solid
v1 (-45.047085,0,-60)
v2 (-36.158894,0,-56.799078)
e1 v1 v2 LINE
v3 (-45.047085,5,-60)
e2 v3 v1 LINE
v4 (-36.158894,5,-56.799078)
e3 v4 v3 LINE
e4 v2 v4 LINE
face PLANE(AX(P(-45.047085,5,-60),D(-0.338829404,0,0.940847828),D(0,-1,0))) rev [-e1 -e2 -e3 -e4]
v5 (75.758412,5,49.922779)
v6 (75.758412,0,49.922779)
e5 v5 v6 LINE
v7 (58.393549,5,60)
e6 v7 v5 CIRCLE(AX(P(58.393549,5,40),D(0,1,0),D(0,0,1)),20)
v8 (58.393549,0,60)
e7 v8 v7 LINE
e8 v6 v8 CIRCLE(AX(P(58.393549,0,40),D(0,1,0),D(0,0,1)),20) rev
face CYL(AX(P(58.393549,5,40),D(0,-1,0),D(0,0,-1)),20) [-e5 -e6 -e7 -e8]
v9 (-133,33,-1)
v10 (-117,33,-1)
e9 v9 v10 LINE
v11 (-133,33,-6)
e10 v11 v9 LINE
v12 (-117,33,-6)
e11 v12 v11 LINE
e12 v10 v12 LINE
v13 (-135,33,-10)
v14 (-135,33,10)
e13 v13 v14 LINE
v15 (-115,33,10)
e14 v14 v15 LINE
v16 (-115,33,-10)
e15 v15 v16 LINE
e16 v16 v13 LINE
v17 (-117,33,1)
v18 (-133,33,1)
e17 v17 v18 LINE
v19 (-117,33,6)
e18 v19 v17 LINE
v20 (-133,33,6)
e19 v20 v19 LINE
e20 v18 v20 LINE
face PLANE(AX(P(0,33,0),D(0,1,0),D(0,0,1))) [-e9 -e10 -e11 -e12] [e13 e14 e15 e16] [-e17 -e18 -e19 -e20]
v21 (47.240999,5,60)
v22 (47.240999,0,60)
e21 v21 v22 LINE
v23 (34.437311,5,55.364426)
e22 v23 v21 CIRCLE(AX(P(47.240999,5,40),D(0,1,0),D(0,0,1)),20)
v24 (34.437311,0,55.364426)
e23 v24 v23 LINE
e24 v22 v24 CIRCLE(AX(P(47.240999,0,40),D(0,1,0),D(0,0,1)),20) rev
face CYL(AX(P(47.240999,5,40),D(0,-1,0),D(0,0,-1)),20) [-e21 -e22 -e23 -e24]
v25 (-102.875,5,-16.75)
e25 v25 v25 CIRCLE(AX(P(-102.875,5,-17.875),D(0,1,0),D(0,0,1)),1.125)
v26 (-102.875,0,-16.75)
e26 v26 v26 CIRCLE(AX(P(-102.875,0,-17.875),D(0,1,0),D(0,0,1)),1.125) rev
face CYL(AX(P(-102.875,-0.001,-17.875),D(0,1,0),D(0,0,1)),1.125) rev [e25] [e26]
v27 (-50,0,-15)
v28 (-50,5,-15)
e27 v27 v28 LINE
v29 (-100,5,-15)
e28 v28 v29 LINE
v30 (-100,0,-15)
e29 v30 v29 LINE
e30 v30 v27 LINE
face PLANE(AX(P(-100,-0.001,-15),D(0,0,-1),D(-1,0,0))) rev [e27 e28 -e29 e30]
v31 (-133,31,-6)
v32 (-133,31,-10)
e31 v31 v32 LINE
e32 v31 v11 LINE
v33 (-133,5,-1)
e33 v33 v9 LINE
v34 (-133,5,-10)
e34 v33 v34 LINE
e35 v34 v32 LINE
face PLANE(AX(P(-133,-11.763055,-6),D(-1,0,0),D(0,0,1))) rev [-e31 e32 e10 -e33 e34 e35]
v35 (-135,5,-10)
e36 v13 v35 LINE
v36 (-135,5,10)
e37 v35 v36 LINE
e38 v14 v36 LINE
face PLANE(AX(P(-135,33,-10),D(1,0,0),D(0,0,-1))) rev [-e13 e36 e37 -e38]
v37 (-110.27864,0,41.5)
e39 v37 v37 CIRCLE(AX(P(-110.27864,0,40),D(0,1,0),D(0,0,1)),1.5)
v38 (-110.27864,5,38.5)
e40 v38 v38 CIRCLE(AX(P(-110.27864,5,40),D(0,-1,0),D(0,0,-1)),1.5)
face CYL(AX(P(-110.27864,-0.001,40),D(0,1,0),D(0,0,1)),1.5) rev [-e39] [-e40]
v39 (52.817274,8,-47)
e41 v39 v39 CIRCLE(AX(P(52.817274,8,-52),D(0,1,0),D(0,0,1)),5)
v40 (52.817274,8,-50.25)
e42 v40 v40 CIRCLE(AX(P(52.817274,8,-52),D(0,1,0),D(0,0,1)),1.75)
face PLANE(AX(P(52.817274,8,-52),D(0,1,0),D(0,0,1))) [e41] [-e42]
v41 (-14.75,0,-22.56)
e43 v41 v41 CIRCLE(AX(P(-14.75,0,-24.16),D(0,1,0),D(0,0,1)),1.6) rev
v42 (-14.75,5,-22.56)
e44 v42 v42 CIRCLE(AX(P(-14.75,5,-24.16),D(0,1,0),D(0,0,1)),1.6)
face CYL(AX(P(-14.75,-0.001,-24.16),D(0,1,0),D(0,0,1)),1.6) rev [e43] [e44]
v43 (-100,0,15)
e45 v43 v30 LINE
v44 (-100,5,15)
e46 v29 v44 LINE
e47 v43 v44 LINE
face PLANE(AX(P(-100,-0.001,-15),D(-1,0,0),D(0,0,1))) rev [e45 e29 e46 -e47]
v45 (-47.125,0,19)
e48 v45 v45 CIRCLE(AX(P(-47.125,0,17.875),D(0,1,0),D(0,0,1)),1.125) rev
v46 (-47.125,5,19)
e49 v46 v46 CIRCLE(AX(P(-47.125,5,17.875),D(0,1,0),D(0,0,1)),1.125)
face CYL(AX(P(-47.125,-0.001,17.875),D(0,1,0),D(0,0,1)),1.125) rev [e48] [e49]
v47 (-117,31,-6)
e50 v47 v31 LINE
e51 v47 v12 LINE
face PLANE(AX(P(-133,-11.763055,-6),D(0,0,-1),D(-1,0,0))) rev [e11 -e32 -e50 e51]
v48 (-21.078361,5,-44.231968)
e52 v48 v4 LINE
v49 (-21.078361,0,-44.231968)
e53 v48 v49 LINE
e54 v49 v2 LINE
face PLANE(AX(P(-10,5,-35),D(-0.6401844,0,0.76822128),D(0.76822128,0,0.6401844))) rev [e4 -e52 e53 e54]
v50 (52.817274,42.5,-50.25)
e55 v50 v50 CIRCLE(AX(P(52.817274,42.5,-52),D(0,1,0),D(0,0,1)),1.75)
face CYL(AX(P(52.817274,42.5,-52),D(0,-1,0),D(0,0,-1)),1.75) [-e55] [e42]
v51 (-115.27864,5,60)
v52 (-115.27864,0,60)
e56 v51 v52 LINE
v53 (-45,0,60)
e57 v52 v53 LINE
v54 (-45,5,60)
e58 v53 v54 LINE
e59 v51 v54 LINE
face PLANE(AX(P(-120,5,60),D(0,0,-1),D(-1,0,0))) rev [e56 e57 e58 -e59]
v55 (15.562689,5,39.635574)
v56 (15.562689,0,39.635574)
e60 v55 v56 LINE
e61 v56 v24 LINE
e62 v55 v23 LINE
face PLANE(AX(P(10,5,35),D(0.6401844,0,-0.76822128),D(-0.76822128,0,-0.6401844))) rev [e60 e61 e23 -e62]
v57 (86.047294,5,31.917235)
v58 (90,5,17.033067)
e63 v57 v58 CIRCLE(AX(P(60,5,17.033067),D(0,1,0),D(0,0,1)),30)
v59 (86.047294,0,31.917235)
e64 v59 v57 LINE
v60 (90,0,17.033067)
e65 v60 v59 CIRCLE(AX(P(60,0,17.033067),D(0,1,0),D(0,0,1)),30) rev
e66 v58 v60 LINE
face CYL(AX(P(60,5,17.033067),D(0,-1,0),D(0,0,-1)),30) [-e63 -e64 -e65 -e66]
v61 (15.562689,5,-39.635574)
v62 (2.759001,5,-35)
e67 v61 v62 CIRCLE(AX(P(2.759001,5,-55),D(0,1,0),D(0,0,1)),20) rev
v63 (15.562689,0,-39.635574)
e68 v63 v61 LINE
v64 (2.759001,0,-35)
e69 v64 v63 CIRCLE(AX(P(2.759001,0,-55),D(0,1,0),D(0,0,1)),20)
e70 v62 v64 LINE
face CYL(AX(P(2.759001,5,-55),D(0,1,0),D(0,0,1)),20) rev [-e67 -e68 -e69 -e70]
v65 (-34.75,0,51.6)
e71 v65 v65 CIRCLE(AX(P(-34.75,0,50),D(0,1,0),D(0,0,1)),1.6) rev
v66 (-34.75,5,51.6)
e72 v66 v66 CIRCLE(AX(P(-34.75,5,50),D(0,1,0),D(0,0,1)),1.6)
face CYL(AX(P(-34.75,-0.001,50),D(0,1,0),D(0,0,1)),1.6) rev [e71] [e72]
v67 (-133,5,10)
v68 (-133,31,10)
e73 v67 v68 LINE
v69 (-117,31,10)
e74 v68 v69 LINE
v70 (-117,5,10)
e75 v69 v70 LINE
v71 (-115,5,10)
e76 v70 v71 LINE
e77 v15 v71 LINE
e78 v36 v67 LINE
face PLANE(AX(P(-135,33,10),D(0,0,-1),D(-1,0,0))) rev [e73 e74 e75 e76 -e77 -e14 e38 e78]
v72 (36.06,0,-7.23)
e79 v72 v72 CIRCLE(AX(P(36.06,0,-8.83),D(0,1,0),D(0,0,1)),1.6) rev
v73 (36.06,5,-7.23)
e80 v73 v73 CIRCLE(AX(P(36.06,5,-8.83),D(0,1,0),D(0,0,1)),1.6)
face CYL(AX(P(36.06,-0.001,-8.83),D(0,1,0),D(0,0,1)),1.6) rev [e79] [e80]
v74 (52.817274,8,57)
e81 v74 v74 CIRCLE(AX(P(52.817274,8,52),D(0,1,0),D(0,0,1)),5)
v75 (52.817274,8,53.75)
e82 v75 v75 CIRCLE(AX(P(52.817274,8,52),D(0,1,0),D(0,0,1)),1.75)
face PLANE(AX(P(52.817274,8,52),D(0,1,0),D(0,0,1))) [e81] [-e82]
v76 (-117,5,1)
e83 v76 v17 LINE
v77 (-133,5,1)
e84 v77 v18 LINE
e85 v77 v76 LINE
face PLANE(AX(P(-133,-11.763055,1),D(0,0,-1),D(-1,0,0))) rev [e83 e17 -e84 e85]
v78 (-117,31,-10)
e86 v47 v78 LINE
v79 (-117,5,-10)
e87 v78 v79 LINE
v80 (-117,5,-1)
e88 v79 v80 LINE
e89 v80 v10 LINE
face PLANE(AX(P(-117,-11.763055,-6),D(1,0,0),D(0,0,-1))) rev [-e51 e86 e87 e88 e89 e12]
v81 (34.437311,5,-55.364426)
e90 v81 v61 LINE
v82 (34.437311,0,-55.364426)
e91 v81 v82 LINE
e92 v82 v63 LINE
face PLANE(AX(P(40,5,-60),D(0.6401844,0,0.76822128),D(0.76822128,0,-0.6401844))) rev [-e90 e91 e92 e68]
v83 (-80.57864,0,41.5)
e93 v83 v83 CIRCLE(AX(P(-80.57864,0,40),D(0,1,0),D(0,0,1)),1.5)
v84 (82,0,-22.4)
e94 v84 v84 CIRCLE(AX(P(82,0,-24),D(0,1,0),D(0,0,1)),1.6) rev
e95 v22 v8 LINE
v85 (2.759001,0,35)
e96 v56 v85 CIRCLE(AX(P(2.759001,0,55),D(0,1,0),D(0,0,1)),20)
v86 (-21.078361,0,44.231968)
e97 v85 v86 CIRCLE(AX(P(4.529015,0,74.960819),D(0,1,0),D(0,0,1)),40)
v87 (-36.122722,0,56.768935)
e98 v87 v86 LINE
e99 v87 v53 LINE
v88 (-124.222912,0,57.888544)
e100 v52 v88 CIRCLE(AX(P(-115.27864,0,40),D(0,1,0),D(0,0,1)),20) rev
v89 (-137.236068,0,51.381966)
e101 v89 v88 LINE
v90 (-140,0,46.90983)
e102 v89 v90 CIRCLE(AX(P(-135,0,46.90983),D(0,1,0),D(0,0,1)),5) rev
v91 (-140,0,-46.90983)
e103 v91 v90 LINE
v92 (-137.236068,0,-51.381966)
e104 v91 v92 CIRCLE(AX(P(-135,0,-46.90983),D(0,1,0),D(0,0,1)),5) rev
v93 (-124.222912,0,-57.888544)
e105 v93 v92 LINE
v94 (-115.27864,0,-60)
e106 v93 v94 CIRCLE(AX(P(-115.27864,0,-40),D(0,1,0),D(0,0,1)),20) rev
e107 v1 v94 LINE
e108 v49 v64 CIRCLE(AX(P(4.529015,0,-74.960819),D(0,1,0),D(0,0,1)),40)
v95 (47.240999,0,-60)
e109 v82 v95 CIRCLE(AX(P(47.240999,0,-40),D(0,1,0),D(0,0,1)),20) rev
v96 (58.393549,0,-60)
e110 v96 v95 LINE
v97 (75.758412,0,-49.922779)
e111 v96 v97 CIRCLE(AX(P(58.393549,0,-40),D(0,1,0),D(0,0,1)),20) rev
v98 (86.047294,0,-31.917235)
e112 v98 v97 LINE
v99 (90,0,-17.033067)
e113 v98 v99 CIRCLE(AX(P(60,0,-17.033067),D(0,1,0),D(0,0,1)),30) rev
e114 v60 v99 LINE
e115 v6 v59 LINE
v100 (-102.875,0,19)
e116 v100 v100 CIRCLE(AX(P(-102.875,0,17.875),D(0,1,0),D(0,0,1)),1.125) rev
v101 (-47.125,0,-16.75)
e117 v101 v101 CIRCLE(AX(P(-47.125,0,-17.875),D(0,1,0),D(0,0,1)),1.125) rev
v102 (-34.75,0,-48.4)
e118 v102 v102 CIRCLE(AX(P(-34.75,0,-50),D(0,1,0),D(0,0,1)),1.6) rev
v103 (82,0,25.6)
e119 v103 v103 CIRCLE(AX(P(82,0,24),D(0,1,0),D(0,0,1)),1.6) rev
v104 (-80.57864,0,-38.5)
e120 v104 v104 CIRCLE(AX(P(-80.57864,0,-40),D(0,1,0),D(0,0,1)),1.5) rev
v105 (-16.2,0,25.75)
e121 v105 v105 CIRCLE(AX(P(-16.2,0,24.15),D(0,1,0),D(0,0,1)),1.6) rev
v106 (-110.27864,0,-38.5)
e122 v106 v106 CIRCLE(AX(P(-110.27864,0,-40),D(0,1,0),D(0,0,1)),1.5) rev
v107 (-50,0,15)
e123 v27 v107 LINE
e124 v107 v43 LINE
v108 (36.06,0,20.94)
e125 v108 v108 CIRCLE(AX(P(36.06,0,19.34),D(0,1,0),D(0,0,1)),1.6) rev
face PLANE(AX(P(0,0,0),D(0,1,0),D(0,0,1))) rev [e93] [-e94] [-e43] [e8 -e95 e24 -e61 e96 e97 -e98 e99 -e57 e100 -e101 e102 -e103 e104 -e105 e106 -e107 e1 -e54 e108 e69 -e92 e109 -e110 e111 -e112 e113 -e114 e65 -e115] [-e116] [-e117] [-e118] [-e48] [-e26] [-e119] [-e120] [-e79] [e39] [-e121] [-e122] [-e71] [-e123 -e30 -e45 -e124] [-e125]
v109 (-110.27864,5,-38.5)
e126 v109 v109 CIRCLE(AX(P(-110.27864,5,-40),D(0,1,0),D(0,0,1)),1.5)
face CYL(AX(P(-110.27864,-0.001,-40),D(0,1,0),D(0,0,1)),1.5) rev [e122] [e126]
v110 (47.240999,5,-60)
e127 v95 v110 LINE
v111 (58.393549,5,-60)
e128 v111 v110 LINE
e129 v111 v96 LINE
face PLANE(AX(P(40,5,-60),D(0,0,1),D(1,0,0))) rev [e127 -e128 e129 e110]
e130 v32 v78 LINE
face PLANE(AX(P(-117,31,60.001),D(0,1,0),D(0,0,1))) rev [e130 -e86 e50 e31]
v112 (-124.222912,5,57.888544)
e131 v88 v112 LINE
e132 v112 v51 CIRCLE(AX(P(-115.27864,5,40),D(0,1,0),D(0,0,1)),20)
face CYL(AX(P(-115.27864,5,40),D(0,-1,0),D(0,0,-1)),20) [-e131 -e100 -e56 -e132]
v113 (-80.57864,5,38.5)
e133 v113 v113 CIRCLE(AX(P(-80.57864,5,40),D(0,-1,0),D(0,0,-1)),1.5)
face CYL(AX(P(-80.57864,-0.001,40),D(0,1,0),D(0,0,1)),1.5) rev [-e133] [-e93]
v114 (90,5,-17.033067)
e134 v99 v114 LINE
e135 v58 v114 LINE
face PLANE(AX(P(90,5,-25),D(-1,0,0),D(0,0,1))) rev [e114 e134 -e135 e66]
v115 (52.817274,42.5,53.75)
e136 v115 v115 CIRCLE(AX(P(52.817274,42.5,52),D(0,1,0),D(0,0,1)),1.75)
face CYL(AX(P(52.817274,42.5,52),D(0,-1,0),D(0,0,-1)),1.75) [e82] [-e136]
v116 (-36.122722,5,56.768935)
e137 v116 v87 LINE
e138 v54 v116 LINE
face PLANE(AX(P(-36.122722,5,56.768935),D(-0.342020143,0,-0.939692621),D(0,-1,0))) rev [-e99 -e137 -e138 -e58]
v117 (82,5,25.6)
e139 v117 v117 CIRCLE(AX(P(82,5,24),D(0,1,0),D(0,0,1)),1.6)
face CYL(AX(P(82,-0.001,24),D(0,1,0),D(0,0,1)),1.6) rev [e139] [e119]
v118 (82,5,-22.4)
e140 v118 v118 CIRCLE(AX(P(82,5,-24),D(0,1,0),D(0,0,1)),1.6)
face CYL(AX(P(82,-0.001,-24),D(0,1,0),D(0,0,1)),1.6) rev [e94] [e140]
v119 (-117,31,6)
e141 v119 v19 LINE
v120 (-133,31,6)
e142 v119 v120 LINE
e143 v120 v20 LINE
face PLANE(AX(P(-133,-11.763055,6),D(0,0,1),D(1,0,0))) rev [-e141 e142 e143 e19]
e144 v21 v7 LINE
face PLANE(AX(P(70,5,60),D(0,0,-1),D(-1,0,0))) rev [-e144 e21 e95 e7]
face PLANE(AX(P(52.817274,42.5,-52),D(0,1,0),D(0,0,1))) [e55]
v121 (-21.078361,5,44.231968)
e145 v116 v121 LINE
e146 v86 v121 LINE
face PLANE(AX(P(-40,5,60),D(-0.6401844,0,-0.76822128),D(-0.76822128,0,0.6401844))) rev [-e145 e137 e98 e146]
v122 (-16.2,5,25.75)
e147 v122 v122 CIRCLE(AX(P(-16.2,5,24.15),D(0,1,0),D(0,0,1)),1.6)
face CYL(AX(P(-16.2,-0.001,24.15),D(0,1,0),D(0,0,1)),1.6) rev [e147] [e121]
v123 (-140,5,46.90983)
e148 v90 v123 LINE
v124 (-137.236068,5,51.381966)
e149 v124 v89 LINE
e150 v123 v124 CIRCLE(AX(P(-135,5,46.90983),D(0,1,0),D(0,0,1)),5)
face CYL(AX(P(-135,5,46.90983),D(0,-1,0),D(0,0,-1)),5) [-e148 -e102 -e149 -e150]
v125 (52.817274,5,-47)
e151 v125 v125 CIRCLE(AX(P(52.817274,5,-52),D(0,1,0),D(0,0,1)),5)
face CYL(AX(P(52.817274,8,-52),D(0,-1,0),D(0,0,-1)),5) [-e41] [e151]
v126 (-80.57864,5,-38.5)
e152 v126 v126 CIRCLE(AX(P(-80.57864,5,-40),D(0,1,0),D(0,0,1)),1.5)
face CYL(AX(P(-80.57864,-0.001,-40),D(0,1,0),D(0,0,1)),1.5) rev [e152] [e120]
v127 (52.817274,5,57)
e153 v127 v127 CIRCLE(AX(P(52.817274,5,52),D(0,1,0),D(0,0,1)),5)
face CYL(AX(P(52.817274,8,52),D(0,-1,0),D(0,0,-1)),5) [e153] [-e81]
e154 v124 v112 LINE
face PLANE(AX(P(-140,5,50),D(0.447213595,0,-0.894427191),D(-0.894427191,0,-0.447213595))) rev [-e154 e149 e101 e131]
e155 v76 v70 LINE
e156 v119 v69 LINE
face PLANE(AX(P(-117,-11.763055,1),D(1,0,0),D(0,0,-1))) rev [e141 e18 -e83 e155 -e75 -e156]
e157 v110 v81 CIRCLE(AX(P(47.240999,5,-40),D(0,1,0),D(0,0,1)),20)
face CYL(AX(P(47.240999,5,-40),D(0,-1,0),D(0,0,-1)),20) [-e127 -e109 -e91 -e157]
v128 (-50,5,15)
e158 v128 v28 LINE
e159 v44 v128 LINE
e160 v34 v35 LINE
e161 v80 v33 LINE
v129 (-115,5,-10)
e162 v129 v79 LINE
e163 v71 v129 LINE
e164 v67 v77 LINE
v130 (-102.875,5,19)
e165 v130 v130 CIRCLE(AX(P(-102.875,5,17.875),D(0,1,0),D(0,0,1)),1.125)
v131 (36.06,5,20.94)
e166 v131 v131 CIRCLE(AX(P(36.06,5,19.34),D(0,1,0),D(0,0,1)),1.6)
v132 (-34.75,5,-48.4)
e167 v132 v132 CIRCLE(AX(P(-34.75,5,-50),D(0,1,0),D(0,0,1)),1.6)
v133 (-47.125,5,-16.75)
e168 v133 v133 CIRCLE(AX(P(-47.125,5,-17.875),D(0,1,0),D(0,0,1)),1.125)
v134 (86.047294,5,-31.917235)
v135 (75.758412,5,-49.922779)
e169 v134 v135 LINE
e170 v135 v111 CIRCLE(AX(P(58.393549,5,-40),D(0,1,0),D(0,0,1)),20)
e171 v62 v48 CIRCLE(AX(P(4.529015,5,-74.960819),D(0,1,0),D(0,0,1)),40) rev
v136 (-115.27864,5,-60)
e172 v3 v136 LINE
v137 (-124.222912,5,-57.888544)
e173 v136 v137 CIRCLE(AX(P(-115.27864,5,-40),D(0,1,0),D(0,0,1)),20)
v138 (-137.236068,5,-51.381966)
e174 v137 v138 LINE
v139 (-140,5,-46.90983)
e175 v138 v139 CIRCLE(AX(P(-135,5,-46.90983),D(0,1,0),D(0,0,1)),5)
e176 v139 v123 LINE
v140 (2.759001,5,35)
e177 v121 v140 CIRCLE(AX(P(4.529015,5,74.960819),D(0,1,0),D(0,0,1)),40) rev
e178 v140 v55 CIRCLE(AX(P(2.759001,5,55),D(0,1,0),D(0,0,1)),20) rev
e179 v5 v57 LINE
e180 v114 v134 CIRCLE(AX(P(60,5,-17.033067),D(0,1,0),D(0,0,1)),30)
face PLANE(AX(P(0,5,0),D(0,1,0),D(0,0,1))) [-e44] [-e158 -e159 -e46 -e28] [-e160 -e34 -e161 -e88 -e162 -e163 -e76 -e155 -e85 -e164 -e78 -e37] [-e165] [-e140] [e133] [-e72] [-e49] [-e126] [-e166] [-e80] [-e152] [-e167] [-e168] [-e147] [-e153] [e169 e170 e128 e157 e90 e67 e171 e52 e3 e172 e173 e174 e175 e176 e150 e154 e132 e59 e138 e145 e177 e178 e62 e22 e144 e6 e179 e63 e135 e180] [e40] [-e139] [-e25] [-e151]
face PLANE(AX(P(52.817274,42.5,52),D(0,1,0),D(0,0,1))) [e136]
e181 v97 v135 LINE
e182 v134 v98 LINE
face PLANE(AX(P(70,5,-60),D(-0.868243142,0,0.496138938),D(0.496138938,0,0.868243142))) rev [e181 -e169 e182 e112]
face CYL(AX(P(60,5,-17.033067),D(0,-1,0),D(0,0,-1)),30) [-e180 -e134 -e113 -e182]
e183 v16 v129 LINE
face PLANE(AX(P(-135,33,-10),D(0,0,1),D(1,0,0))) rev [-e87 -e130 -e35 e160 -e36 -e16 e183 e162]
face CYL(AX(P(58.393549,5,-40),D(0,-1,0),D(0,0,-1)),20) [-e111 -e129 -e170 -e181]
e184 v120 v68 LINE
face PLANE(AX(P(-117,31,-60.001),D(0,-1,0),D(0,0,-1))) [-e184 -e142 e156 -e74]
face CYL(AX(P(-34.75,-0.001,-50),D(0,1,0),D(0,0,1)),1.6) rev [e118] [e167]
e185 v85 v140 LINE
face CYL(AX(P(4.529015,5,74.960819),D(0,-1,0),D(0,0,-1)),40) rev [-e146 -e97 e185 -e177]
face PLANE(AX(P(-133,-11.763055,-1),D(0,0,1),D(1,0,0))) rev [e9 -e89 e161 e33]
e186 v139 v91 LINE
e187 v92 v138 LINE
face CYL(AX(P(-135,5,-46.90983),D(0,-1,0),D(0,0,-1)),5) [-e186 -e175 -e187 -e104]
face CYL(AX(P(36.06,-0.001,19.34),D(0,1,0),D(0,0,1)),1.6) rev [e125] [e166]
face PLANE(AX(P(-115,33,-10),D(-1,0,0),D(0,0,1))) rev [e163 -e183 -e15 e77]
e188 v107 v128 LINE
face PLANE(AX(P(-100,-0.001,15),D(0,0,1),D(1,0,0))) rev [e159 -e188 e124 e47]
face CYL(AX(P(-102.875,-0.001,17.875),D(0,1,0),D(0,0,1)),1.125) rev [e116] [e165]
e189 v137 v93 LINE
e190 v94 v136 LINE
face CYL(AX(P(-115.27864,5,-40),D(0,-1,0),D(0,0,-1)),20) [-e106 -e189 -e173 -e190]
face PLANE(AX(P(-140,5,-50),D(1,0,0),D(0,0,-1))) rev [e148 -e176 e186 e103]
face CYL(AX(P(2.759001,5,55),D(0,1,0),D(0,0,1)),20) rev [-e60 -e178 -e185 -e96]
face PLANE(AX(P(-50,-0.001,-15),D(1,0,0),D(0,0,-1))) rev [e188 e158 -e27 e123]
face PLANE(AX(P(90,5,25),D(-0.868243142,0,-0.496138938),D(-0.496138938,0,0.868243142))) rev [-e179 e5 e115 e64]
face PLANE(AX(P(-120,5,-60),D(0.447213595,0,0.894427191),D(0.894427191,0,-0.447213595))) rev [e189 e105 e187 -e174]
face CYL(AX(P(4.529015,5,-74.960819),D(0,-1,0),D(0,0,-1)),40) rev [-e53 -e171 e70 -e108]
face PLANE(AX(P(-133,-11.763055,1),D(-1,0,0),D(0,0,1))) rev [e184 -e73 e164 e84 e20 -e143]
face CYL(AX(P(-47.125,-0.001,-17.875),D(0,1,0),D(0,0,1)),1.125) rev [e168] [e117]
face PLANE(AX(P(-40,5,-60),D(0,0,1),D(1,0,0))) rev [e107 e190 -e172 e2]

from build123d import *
from OCP.BRepFilletAPI import BRepFilletAPI_MakeChamfer

# Parameters (mm, degrees)
BOSS_EXTRUDE1_DEPTH = 5
CHAMFER1_SIZE       = 5
CHAMFER1_SIZE2      = 5.047084744
FILLET4_R           = 20
FILLET5_R           = 30
FILLET6_R           = 20
FILLET7_R           = 40
FILLET8_R           = 20
FILLET9_R           = 5
CUT_EXTRUDE3_REACH  = 154.398
SKETCH7_R           = 1.5
SKETCH3_R           = 1.75
BOSS_EXTRUDE2_DEPTH = 37.5
SKETCH8_R           = 5
BOSS_EXTRUDE3_DEPTH = 3
SKETCH9_W           = 20
SKETCH9_H           = 20
BOSS_EXTRUDE4_DEPTH = 28
SKETCH12_W          = 16
SKETCH12_H          = 5
CUT_EXTRUDE5_DEPTH  = 28
CUT_EXTRUDE7_REACH  = 164.192
SKETCH13_W          = 16
SKETCH13_H          = 26
CUT_EXTRUDE8_REACH  = 158.864
SKETCH15_R          = 1.125
CUT_EXTRUDE10_REACH = 158.864
SKETCH16_W          = 50
SKETCH16_H          = 30
CUT_EXTRUDE11_REACH = 158.864
SKETCH17_R          = 1.6
CUT_EXTRUDE12_REACH = 158.864
SKETCH18_R          = 1.6
CUT_EXTRUDE13_REACH = 158.864
SKETCH19_R          = 1.6


with BuildPart() as part:
    # Sketch1 → Boss-Extrude1 (new body)
    with BuildSketch(Plane(origin=(0, 0, 0), x_dir=(1, 0, 0), z_dir=(0, 1, 0))):
        Polygon((40, 60), (70, 60), (90, 25), (90, -25), (70, -60), (40, -60), (10, -35), (-10, -35), (-40, -60), (-120, -60), (-140, -50), (-140, 50), (-120, 60), (-40, 60), (-10, 35), (10, 35), align=None)
    extrude(amount=BOSS_EXTRUDE1_DEPTH)

    # Chamfer1: one chamfer whose edges measure the first distance from different faces: ONE call of the kernel's chamfer builder (chamfer() names one face for all edges)
    chamfer1_edges_1 = [part.edges().sort_by_distance(p)[0] for p in [
        (-40, 2.5, 60),
    ]]
    chamfer1_side_1 = [part.faces().sort_by_distance(p)[0] for p in [
        (-80, 2.5, 60),
    ]]
    chamfer1_edges_2 = [part.edges().sort_by_distance(p)[0] for p in [
        (-40, 2.5, -60),
    ]]
    chamfer1_side_2 = [part.faces().sort_by_distance(p)[0] for p in [
        (-25, 2.5, -47.5),
    ]]
    chamfer1 = BRepFilletAPI_MakeChamfer(part.part.solid().wrapped)
    for e in chamfer1_edges_1:
        chamfer1.Add(CHAMFER1_SIZE, CHAMFER1_SIZE2, e.wrapped, chamfer1_side_1[0].wrapped)  # the first distance lies on this face
    for e in chamfer1_edges_2:
        chamfer1.Add(CHAMFER1_SIZE, CHAMFER1_SIZE2, e.wrapped, chamfer1_side_2[0].wrapped)  # the first distance lies on this face
    add(Compound.cast(chamfer1.Shape()), mode=Mode.REPLACE)

    # Fillet4
    fillet4_edges = [part.edges().sort_by_distance(p)[0] for p in [
        (40, 2.5, -60),
        (70, 2.5, -60),
        (70, 2.5, 60),
        (40, 2.5, 60),
    ]]
    fillet(fillet4_edges, radius=FILLET4_R)

    # Fillet5
    fillet5_edges = [part.edges().sort_by_distance(p)[0] for p in [
        (90, 2.5, -25),
        (90, 2.5, 25),
    ]]
    fillet(fillet5_edges, radius=FILLET5_R)

    # Fillet6
    fillet6_edges = [part.edges().sort_by_distance(p)[0] for p in [
        (10, 2.5, 35),
        (10, 2.5, -35),
    ]]
    fillet(fillet6_edges, radius=FILLET6_R)

    # Fillet7
    # the kernel refuses this fillet: 40 mm, written as the material it adds along each edge
    with BuildSketch(Plane(origin=(-10, 0, -35), x_dir=(-0.768221279597376, 0, -0.6401843996644798), z_dir=(0, 1, 0))) as fillet7_piece_1:
        with BuildLine():
            CenterArc((14.420794682, -40), FILLET7_R, 90, 37.26938559)
            Line((-9.801736302, -8.168113585), (0, 0))
            Line((0, 0), (14.420794682, 0))
        make_face()
    extrude(amount=5)
    with BuildSketch(Plane(origin=(-10, 0, 35), x_dir=(1, 0, 0), z_dir=(0, 1, 0))) as fillet7_piece_2:
        with BuildLine():
            CenterArc((14.529014643, -39.96081897), FILLET7_R, 92.536185502, 37.26938559)
            Line((-11.078361343, -9.231967786), (0, 0))
            Line((0, 0), (12.759001296, 0))
        make_face()
    extrude(amount=5)

    # Fillet8
    fillet8_edges = [part.edges().sort_by_distance(p)[0] for p in [
        (-120, 2.5, 60),
        (-120, 2.5, -60),
    ]]
    fillet(fillet8_edges, radius=FILLET8_R)

    # Fillet9
    fillet9_edges = [part.edges().sort_by_distance(p)[0] for p in [
        (-140, 2.5, 50),
        (-140, 2.5, -50),
    ]]
    fillet(fillet9_edges, radius=FILLET9_R)

    # Sketch7 → Cut-Extrude3 (cut, up to next)
    with BuildSketch(Plane(origin=(0, 5, 0), x_dir=(1, 0, 0), z_dir=(0, 1, 0)), mode=Mode.PRIVATE) as cut_extrude3_sk1:
        with Locations(Location((-110.27864045, 40, 0), (0, 0, 270))):
            Circle(SKETCH7_R)
    cut_extrude3_tool1 = extrude(cut_extrude3_sk1.sketch, amount=-CUT_EXTRUDE3_REACH, mode=Mode.PRIVATE) & part.part
    # Sketch7 → Cut-Extrude3 (cut, up to next)
    with BuildSketch(Plane(origin=(0, 5, 0), x_dir=(1, 0, 0), z_dir=(0, 1, 0)), mode=Mode.PRIVATE) as cut_extrude3_sk2:
        with Locations(Location((-80.57864045, 40, 0), (0, 0, 270))):
            Circle(SKETCH7_R)
    cut_extrude3_tool2 = extrude(cut_extrude3_sk2.sketch, amount=-CUT_EXTRUDE3_REACH, mode=Mode.PRIVATE) & part.part
    cut_extrude3_1 = cut_extrude3_tool1.solids().sort_by_distance((-110.27864, 5, -40))[0]
    add(cut_extrude3_1, mode=Mode.SUBTRACT)
    cut_extrude3_2 = cut_extrude3_tool2.solids().sort_by_distance((-80.57864, 5, -40))[0]
    add(cut_extrude3_2, mode=Mode.SUBTRACT)
    cut_extrude3 = cut_extrude3_1 + cut_extrude3_2  # Cut-Extrude3 as one shape, for the pattern or mirror that repeats it

    # Mirror1: Cut-Extrude3 across plane
    add(cut_extrude3.mirror(Plane.XY), mode=Mode.SUBTRACT)

    # Sketch3 → Boss-Extrude2 (add)
    with BuildSketch(Plane(origin=(0, 5, 0), x_dir=(1, 0, 0), z_dir=(0, 1, 0))):
        with Locations(Location((52.817273997, 52, 0), (0, 0, 270))):
            Circle(SKETCH3_R)
        with Locations(Location((52.817273997, -52, 0), (0, 0, 270))):
            Circle(SKETCH3_R)
    extrude(amount=BOSS_EXTRUDE2_DEPTH)

    # Sketch8 → Boss-Extrude3 (add)
    with BuildSketch(Plane(origin=(0, 5, 0), x_dir=(1, 0, 0), z_dir=(0, 1, 0))):
        with Locations(Location((52.817273997, 52, 0), (0, 0, 270))):
            Circle(SKETCH8_R)
        with Locations(Location((52.817273997, -52, 0), (0, 0, 270))):
            Circle(SKETCH8_R)
    extrude(amount=BOSS_EXTRUDE3_DEPTH)

    # Sketch9 → Boss-Extrude4 (add)
    with BuildSketch(Plane(origin=(0, 5, 0), x_dir=(1, 0, 0), z_dir=(0, 1, 0))):
        with Locations((-125, 0)):
            Rectangle(SKETCH9_W, SKETCH9_H)
    extrude(amount=BOSS_EXTRUDE4_DEPTH)

    # Sketch12 → Cut-Extrude5 (cut)
    with BuildSketch(Plane(origin=(0, 33, 0), x_dir=(1, 0, 0), z_dir=(0, 1, 0))):
        with Locations((-125, -3.5)):
            Rectangle(SKETCH12_W, SKETCH12_H)
        with Locations((-125, 3.5)):
            Rectangle(SKETCH12_W, SKETCH12_H)
    extrude(amount=-CUT_EXTRUDE5_DEPTH, mode=Mode.SUBTRACT)

    # Sketch13 → Cut-Extrude7 (cut, up to next)
    with BuildSketch(Plane(origin=(0, 0, -10), x_dir=(-1, 0, 0), z_dir=(0, 0, -1)), mode=Mode.PRIVATE) as cut_extrude7_sk1:
        with Locations((125, 18)):
            Rectangle(SKETCH13_W, SKETCH13_H)
    cut_extrude7_tool1 = extrude(cut_extrude7_sk1.sketch, amount=-CUT_EXTRUDE7_REACH, mode=Mode.PRIVATE) & part.part
    cut_extrude7 = cut_extrude7_tool1.solids().sort_by_distance((-125, 18, -10))[0]
    add(cut_extrude7, mode=Mode.SUBTRACT)

    # Mirror2: Cut-Extrude7 across plane
    add(cut_extrude7.mirror(Plane.XY), mode=Mode.SUBTRACT)

    # Sketch15 → Cut-Extrude8 (cut, up to next)
    with BuildSketch(Plane(origin=(0, 5, 0), x_dir=(1, 0, 0), z_dir=(0, 1, 0)), mode=Mode.PRIVATE) as cut_extrude8_sk1:
        with Locations(Location((-102.875, 17.875, 0), (0, 0, 270))):
            Circle(SKETCH15_R)
    cut_extrude8_tool1 = extrude(cut_extrude8_sk1.sketch, amount=-CUT_EXTRUDE8_REACH, mode=Mode.PRIVATE) & part.part
    # Sketch15 → Cut-Extrude8 (cut, up to next)
    with BuildSketch(Plane(origin=(0, 5, 0), x_dir=(1, 0, 0), z_dir=(0, 1, 0)), mode=Mode.PRIVATE) as cut_extrude8_sk2:
        with Locations(Location((-102.875, -17.875, 0), (0, 0, 270))):
            Circle(SKETCH15_R)
    cut_extrude8_tool2 = extrude(cut_extrude8_sk2.sketch, amount=-CUT_EXTRUDE8_REACH, mode=Mode.PRIVATE) & part.part
    # Sketch15 → Cut-Extrude8 (cut, up to next)
    with BuildSketch(Plane(origin=(0, 5, 0), x_dir=(1, 0, 0), z_dir=(0, 1, 0)), mode=Mode.PRIVATE) as cut_extrude8_sk3:
        with Locations(Location((-47.125, -17.875, 0), (0, 0, 270))):
            Circle(SKETCH15_R)
    cut_extrude8_tool3 = extrude(cut_extrude8_sk3.sketch, amount=-CUT_EXTRUDE8_REACH, mode=Mode.PRIVATE) & part.part
    # Sketch15 → Cut-Extrude8 (cut, up to next)
    with BuildSketch(Plane(origin=(0, 5, 0), x_dir=(1, 0, 0), z_dir=(0, 1, 0)), mode=Mode.PRIVATE) as cut_extrude8_sk4:
        with Locations(Location((-47.125, 17.875, 0), (0, 0, 270))):
            Circle(SKETCH15_R)
    cut_extrude8_tool4 = extrude(cut_extrude8_sk4.sketch, amount=-CUT_EXTRUDE8_REACH, mode=Mode.PRIVATE) & part.part
    add(cut_extrude8_tool1.solids().sort_by_distance((-102.875, 5, -17.875))[0], mode=Mode.SUBTRACT)
    add(cut_extrude8_tool2.solids().sort_by_distance((-102.875, 5, 17.875))[0], mode=Mode.SUBTRACT)
    add(cut_extrude8_tool3.solids().sort_by_distance((-47.125, 5, 17.875))[0], mode=Mode.SUBTRACT)
    add(cut_extrude8_tool4.solids().sort_by_distance((-47.125, 5, -17.875))[0], mode=Mode.SUBTRACT)

    # Sketch16 → Cut-Extrude10 (cut, up to next)
    with BuildSketch(Plane(origin=(0, 5, 0), x_dir=(1, 0, 0), z_dir=(0, 1, 0)), mode=Mode.PRIVATE) as cut_extrude10_sk1:
        with Locations((-75, 0)):
            Rectangle(SKETCH16_W, SKETCH16_H)
    cut_extrude10_tool1 = extrude(cut_extrude10_sk1.sketch, amount=-CUT_EXTRUDE10_REACH, mode=Mode.PRIVATE) & part.part
    add(cut_extrude10_tool1.solids().sort_by_distance((-75, 5, 0))[0], mode=Mode.SUBTRACT)

    # Sketch17 → Cut-Extrude11 (cut, up to next)
    with BuildSketch(Plane(origin=(0, 5, 0), x_dir=(1, 0, 0), z_dir=(0, 1, 0)), mode=Mode.PRIVATE) as cut_extrude11_sk1:
        with Locations(Location((-14.75, 24.16, 0), (0, 0, 270))):
            Circle(SKETCH17_R)
    cut_extrude11_tool1 = extrude(cut_extrude11_sk1.sketch, amount=-CUT_EXTRUDE11_REACH, mode=Mode.PRIVATE) & part.part
    # Sketch17 → Cut-Extrude11 (cut, up to next)
    with BuildSketch(Plane(origin=(0, 5, 0), x_dir=(1, 0, 0), z_dir=(0, 1, 0)), mode=Mode.PRIVATE) as cut_extrude11_sk2:
        with Locations(Location((-16.2, -24.15, 0), (0, 0, 270))):
            Circle(SKETCH17_R)
    cut_extrude11_tool2 = extrude(cut_extrude11_sk2.sketch, amount=-CUT_EXTRUDE11_REACH, mode=Mode.PRIVATE) & part.part
    # Sketch17 → Cut-Extrude11 (cut, up to next)
    with BuildSketch(Plane(origin=(0, 5, 0), x_dir=(1, 0, 0), z_dir=(0, 1, 0)), mode=Mode.PRIVATE) as cut_extrude11_sk3:
        with Locations(Location((36.06, -19.34, 0), (0, 0, 270))):
            Circle(SKETCH17_R)
    cut_extrude11_tool3 = extrude(cut_extrude11_sk3.sketch, amount=-CUT_EXTRUDE11_REACH, mode=Mode.PRIVATE) & part.part
    # Sketch17 → Cut-Extrude11 (cut, up to next)
    with BuildSketch(Plane(origin=(0, 5, 0), x_dir=(1, 0, 0), z_dir=(0, 1, 0)), mode=Mode.PRIVATE) as cut_extrude11_sk4:
        with Locations(Location((36.06, 8.83, 0), (0, 0, 270))):
            Circle(SKETCH17_R)
    cut_extrude11_tool4 = extrude(cut_extrude11_sk4.sketch, amount=-CUT_EXTRUDE11_REACH, mode=Mode.PRIVATE) & part.part
    add(cut_extrude11_tool1.solids().sort_by_distance((-14.75, 5, -24.16))[0], mode=Mode.SUBTRACT)
    add(cut_extrude11_tool2.solids().sort_by_distance((-16.2, 5, 24.15))[0], mode=Mode.SUBTRACT)
    add(cut_extrude11_tool3.solids().sort_by_distance((36.06, 5, 19.34))[0], mode=Mode.SUBTRACT)
    add(cut_extrude11_tool4.solids().sort_by_distance((36.06, 5, -8.83))[0], mode=Mode.SUBTRACT)

    # Sketch18 → Cut-Extrude12 (cut, up to next)
    with BuildSketch(Plane(origin=(0, 5, 0), x_dir=(1, 0, 0), z_dir=(0, 1, 0)), mode=Mode.PRIVATE) as cut_extrude12_sk1:
        with Locations(Location((82, 24, 0), (0, 0, 270))):
            Circle(SKETCH18_R)
    cut_extrude12_tool1 = extrude(cut_extrude12_sk1.sketch, amount=-CUT_EXTRUDE12_REACH, mode=Mode.PRIVATE) & part.part
    # Sketch18 → Cut-Extrude12 (cut, up to next)
    with BuildSketch(Plane(origin=(0, 5, 0), x_dir=(1, 0, 0), z_dir=(0, 1, 0)), mode=Mode.PRIVATE) as cut_extrude12_sk2:
        with Locations(Location((82, -24, 0), (0, 0, 270))):
            Circle(SKETCH18_R)
    cut_extrude12_tool2 = extrude(cut_extrude12_sk2.sketch, amount=-CUT_EXTRUDE12_REACH, mode=Mode.PRIVATE) & part.part
    add(cut_extrude12_tool1.solids().sort_by_distance((82, 5, -24))[0], mode=Mode.SUBTRACT)
    add(cut_extrude12_tool2.solids().sort_by_distance((82, 5, 24))[0], mode=Mode.SUBTRACT)

    # Sketch19 → Cut-Extrude13 (cut, up to next)
    with BuildSketch(Plane(origin=(0, 5, 0), x_dir=(1, 0, 0), z_dir=(0, 1, 0)), mode=Mode.PRIVATE) as cut_extrude13_sk1:
        with Locations(Location((-34.75, -50, 0), (0, 0, 270))):
            Circle(SKETCH19_R)
    cut_extrude13_tool1 = extrude(cut_extrude13_sk1.sketch, amount=-CUT_EXTRUDE13_REACH, mode=Mode.PRIVATE) & part.part
    # Sketch19 → Cut-Extrude13 (cut, up to next)
    with BuildSketch(Plane(origin=(0, 5, 0), x_dir=(1, 0, 0), z_dir=(0, 1, 0)), mode=Mode.PRIVATE) as cut_extrude13_sk2:
        with Locations(Location((-34.75, 50, 0), (0, 0, 270))):
            Circle(SKETCH19_R)
    cut_extrude13_tool2 = extrude(cut_extrude13_sk2.sketch, amount=-CUT_EXTRUDE13_REACH, mode=Mode.PRIVATE) & part.part
    add(cut_extrude13_tool1.solids().sort_by_distance((-34.75, 5, 50))[0], mode=Mode.SUBTRACT)
    add(cut_extrude13_tool2.solids().sort_by_distance((-34.75, 5, -50))[0], mode=Mode.SUBTRACT)


solid = part.part
